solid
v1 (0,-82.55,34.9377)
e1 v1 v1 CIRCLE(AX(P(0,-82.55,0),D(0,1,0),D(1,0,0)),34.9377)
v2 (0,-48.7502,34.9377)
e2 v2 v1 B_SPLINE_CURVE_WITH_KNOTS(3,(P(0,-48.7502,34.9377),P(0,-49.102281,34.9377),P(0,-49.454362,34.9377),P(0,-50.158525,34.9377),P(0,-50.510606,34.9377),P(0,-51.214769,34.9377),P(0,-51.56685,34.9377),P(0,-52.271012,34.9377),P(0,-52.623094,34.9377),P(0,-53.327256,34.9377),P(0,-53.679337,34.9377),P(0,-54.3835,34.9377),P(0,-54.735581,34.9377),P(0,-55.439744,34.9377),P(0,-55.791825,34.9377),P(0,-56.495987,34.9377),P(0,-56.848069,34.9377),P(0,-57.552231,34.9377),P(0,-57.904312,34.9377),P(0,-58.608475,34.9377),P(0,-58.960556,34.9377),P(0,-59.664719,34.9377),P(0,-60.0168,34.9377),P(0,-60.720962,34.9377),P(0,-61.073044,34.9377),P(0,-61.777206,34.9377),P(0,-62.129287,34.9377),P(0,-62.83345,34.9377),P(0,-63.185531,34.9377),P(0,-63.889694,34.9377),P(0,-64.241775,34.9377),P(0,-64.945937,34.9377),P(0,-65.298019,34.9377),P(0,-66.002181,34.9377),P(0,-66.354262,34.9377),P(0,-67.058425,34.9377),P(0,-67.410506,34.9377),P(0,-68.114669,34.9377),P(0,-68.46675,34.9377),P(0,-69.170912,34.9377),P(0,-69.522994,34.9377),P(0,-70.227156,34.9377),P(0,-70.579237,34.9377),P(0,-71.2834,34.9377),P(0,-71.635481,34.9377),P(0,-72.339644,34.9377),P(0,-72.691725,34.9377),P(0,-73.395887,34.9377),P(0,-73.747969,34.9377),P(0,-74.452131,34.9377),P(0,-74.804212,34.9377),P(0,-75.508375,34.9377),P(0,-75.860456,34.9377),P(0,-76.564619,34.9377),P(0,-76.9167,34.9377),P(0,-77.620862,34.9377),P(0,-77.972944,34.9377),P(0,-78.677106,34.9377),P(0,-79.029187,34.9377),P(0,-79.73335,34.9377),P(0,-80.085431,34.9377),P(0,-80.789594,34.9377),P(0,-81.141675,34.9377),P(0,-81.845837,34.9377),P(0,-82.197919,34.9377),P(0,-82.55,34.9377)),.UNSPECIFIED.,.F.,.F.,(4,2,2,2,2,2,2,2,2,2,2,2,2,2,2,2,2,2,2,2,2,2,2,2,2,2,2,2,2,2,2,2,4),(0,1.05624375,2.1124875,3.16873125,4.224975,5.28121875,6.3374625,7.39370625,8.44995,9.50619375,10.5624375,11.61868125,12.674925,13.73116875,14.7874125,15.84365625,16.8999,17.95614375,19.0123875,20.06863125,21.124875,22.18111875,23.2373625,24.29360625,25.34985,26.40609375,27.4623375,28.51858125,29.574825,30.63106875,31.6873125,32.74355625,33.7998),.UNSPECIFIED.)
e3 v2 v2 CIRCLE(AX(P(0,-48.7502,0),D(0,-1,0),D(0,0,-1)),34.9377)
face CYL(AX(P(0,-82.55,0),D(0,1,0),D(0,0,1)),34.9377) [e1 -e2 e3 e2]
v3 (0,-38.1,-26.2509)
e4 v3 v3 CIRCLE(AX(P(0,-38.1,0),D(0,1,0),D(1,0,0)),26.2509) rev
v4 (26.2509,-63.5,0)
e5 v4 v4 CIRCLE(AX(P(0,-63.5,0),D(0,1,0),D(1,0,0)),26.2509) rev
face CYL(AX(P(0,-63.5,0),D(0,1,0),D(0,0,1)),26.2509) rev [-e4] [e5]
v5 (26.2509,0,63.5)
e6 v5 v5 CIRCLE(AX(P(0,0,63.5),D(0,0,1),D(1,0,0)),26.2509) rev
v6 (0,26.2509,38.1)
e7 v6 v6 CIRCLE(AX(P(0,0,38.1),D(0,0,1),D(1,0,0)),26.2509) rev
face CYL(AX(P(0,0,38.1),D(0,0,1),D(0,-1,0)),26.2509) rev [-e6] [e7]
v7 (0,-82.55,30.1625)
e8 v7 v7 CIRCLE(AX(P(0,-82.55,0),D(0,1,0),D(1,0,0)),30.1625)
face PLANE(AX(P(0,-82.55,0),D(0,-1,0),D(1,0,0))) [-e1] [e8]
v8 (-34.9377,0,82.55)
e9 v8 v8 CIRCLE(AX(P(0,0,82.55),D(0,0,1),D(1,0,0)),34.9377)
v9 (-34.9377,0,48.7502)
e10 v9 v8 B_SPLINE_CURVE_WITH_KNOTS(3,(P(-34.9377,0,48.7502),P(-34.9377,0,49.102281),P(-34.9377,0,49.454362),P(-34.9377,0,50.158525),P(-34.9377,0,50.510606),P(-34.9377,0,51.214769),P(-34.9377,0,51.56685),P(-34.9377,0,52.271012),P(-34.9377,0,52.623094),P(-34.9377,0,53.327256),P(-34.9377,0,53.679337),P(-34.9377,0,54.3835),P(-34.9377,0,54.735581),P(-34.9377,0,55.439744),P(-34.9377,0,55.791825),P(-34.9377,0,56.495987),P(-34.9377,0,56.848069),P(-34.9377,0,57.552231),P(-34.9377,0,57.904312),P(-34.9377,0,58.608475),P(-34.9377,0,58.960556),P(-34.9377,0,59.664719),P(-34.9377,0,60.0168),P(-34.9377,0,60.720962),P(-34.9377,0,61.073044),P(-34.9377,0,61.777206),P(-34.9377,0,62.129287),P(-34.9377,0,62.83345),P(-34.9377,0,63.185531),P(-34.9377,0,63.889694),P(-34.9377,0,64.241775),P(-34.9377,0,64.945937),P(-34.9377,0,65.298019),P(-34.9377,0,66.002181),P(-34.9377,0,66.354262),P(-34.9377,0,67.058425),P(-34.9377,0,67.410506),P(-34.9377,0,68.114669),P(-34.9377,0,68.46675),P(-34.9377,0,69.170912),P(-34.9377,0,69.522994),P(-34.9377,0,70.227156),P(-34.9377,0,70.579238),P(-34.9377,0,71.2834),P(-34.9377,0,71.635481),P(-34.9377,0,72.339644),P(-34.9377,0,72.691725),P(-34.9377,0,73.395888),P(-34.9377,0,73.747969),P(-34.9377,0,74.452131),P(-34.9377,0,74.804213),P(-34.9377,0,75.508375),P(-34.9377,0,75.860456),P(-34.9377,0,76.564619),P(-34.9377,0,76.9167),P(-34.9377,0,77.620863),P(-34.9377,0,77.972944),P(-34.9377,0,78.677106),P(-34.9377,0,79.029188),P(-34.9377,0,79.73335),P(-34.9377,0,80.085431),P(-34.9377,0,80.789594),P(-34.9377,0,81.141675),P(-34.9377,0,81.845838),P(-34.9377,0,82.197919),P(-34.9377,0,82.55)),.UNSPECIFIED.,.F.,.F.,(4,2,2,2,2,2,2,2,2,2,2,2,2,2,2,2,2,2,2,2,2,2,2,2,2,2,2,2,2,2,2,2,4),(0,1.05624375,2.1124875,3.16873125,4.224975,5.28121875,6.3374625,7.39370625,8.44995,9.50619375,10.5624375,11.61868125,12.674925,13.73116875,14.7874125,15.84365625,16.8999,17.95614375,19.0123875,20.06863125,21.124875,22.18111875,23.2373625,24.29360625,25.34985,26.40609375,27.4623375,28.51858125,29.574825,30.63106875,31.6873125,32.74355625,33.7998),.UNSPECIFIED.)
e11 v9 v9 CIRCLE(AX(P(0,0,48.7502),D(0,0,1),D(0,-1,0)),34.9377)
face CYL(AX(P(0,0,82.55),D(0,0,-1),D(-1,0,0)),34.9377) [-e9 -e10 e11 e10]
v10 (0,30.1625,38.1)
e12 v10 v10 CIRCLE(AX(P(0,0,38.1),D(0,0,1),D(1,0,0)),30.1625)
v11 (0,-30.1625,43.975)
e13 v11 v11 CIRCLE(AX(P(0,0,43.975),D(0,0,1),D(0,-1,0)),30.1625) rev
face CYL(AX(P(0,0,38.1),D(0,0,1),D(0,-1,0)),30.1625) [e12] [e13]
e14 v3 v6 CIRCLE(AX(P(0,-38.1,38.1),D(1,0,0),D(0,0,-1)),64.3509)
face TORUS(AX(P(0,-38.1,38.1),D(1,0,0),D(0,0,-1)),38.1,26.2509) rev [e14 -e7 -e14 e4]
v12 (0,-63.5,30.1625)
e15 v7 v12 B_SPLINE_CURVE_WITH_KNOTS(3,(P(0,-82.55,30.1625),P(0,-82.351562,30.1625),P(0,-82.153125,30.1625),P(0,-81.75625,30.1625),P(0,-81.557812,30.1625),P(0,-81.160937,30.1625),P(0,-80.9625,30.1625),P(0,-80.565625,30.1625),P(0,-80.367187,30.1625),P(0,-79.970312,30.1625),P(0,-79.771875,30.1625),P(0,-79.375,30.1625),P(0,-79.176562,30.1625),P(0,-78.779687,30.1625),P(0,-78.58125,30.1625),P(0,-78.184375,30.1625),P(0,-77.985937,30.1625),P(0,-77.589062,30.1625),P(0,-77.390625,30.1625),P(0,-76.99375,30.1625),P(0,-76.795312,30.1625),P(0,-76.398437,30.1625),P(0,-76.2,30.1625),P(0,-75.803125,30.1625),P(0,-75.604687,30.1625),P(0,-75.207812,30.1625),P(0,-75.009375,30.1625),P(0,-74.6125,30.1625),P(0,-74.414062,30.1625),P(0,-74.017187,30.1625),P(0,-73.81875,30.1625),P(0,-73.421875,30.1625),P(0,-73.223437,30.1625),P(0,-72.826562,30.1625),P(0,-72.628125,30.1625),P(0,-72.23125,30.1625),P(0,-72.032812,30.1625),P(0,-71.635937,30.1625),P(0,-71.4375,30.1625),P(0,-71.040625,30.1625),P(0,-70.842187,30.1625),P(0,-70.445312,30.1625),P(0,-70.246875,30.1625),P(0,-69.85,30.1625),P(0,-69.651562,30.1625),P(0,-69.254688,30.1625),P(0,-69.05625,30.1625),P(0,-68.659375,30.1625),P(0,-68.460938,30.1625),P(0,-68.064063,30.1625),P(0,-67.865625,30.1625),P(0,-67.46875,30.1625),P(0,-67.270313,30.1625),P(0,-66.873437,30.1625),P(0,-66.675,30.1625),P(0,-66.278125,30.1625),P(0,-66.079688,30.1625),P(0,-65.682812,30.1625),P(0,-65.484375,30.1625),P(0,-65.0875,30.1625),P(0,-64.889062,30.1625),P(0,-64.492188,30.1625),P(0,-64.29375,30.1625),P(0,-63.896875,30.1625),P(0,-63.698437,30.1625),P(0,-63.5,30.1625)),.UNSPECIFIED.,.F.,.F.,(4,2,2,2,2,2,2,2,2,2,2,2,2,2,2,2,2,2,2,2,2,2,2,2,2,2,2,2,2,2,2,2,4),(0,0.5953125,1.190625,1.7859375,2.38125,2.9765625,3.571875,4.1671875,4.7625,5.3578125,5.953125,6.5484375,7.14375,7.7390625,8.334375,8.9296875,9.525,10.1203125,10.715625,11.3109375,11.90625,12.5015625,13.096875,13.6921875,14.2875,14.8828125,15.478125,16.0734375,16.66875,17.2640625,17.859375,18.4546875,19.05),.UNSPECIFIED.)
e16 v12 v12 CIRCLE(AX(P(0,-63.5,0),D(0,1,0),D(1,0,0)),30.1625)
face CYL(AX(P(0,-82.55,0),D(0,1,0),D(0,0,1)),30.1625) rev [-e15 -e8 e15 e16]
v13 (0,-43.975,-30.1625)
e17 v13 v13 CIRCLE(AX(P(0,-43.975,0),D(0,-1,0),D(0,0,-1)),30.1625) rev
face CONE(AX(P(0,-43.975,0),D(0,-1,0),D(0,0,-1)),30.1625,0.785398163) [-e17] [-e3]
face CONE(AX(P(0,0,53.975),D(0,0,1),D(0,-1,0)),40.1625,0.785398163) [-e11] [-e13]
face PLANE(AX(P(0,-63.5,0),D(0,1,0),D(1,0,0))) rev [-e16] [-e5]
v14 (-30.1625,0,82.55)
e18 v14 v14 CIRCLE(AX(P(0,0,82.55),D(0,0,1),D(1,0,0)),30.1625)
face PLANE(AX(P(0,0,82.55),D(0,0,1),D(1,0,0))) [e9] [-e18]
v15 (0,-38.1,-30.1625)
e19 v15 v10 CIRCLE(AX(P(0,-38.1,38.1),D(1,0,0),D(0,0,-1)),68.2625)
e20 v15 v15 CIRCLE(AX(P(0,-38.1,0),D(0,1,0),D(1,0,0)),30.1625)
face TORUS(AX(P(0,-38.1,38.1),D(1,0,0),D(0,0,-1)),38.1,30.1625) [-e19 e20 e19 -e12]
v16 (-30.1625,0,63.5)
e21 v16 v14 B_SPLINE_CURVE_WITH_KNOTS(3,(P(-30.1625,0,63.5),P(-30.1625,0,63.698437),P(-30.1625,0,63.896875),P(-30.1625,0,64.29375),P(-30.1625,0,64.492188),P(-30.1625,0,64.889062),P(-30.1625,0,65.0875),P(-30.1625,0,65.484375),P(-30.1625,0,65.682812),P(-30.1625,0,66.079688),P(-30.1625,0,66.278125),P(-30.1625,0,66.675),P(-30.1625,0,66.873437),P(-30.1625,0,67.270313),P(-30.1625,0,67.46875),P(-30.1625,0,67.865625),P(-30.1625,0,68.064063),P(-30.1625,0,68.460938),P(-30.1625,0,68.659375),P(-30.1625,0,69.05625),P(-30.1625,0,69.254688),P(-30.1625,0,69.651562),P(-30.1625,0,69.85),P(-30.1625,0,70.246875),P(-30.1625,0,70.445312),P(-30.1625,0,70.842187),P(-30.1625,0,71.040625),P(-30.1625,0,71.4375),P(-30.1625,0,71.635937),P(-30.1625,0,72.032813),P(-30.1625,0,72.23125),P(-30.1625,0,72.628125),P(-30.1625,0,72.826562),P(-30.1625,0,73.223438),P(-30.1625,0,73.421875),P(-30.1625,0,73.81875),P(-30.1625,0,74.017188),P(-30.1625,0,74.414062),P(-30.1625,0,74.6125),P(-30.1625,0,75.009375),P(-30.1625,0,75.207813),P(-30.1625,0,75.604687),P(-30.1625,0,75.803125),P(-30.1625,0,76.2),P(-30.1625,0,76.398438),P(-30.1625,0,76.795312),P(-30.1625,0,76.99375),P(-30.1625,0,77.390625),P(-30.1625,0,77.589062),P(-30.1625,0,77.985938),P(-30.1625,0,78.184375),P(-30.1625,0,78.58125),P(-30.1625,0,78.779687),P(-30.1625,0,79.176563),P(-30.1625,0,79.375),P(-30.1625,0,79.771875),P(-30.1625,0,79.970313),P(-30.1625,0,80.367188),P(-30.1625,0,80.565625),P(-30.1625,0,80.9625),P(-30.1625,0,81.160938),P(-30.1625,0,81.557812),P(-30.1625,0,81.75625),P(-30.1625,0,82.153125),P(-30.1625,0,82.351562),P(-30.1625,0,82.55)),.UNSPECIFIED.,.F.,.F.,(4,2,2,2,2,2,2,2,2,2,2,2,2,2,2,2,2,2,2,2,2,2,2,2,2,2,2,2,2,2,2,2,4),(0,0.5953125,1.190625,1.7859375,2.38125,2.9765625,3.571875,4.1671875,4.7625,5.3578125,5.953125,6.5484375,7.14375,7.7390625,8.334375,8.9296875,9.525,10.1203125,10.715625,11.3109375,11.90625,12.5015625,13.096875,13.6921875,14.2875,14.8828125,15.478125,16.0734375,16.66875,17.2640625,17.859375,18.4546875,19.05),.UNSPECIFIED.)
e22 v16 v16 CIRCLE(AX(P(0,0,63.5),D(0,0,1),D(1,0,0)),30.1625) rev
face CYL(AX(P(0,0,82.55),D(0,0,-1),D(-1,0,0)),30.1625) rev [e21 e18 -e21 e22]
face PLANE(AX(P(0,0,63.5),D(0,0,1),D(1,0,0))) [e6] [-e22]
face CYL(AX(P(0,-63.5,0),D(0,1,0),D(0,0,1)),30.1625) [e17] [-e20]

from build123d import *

# Parameters (mm, degrees)
SKETCH2_R           = 30.1625
SKETCH2_R_2         = 26.2509
BOSS_EXTRUDE1_START = -9.525
SKETCH9_R           = 34.9377
SKETCH9_R_2         = 30.1625
BOSS_EXTRUDE1_DEPTH = 28.575
CHAMFER1_SIZE       = 10


with BuildPart() as part:
    # Sweep2: sweep along a path in Sketch1
    with BuildLine(Plane(origin=(0, 0, 0), x_dir=(0, 0, -1), z_dir=(1, 0, 0))) as sweep2_path:
        Line((-63.5, 0), (-38.1, 0))
        ThreePointArc((-38.1, 0), (-11.159231637, -11.159231637), (0, -38.1))
        Line((0, -38.1), (0, -63.5))
    # Sketch2 → Sweep2 (sweep)
    with BuildSketch(Plane.XY.offset(63.5)):
        Circle(SKETCH2_R)
        Circle(SKETCH2_R_2, mode=Mode.SUBTRACT)
    sweep(path=sweep2_path.line)

    # Sketch9 → Boss-Extrude1 (add)
    with BuildSketch(Plane.XY.offset(63.5).offset(BOSS_EXTRUDE1_START)):
        with Locations(Location((0, 0, 0), (0, 0, 180))):
            Circle(SKETCH9_R)
        Circle(SKETCH9_R_2, mode=Mode.SUBTRACT)
    boss_extrude1 = extrude(amount=BOSS_EXTRUDE1_DEPTH)

    # Mirror4: Boss-Extrude1 across plane
    add(boss_extrude1.mirror(Plane(origin=(0, 0, 0), x_dir=(0, -0.7071067811865465, 0.7071067811865486), z_dir=(0, 0.7071067811865488, 0.7071067811865464))))

    # Chamfer1
    # the kernel refuses this chamfer: 10 mm, written as the material it adds along each edge
    with BuildSketch(Plane(origin=(0, 0, 53.975), x_dir=(1, 0, 0), z_dir=(0, -1, 0))) as chamfer1_piece_1_section:
        Polygon((30.1625, -CHAMFER1_SIZE), (30.1625 + CHAMFER1_SIZE, 0), (30.1625, 0), align=None)
    chamfer1_piece_1 = revolve(axis=Axis((0, 0, 53.975), (0, 0, 1)), mode=Mode.PRIVATE)
    chamfer1_piece_1 = chamfer1_piece_1 & Plane(origin=(0, 0, 46.362739963), x_dir=(-1, 0, 0), z_dir=(0, 0, -1)) * Cylinder(34.9377, 161, mode=Mode.PRIVATE)
    add(chamfer1_piece_1)
    with BuildSketch(Plane(origin=(0, -53.975, 0), x_dir=(1, 0, 0), z_dir=(0, 0, 1))) as chamfer1_piece_2_section:
        Polygon((30.1625, CHAMFER1_SIZE), (30.1625 + CHAMFER1_SIZE, 0), (30.1625, 0), align=None)
    chamfer1_piece_2 = revolve(axis=Axis((0, -53.975, 0), (0, 1, 0)), mode=Mode.PRIVATE)
    chamfer1_piece_2 = chamfer1_piece_2 & Plane(origin=(0, -46.362739963, 0), x_dir=(-1, 0, 0), z_dir=(0, 1, 0)) * Cylinder(34.9377, 161, mode=Mode.PRIVATE)
    add(chamfer1_piece_2)


solid = part.part
